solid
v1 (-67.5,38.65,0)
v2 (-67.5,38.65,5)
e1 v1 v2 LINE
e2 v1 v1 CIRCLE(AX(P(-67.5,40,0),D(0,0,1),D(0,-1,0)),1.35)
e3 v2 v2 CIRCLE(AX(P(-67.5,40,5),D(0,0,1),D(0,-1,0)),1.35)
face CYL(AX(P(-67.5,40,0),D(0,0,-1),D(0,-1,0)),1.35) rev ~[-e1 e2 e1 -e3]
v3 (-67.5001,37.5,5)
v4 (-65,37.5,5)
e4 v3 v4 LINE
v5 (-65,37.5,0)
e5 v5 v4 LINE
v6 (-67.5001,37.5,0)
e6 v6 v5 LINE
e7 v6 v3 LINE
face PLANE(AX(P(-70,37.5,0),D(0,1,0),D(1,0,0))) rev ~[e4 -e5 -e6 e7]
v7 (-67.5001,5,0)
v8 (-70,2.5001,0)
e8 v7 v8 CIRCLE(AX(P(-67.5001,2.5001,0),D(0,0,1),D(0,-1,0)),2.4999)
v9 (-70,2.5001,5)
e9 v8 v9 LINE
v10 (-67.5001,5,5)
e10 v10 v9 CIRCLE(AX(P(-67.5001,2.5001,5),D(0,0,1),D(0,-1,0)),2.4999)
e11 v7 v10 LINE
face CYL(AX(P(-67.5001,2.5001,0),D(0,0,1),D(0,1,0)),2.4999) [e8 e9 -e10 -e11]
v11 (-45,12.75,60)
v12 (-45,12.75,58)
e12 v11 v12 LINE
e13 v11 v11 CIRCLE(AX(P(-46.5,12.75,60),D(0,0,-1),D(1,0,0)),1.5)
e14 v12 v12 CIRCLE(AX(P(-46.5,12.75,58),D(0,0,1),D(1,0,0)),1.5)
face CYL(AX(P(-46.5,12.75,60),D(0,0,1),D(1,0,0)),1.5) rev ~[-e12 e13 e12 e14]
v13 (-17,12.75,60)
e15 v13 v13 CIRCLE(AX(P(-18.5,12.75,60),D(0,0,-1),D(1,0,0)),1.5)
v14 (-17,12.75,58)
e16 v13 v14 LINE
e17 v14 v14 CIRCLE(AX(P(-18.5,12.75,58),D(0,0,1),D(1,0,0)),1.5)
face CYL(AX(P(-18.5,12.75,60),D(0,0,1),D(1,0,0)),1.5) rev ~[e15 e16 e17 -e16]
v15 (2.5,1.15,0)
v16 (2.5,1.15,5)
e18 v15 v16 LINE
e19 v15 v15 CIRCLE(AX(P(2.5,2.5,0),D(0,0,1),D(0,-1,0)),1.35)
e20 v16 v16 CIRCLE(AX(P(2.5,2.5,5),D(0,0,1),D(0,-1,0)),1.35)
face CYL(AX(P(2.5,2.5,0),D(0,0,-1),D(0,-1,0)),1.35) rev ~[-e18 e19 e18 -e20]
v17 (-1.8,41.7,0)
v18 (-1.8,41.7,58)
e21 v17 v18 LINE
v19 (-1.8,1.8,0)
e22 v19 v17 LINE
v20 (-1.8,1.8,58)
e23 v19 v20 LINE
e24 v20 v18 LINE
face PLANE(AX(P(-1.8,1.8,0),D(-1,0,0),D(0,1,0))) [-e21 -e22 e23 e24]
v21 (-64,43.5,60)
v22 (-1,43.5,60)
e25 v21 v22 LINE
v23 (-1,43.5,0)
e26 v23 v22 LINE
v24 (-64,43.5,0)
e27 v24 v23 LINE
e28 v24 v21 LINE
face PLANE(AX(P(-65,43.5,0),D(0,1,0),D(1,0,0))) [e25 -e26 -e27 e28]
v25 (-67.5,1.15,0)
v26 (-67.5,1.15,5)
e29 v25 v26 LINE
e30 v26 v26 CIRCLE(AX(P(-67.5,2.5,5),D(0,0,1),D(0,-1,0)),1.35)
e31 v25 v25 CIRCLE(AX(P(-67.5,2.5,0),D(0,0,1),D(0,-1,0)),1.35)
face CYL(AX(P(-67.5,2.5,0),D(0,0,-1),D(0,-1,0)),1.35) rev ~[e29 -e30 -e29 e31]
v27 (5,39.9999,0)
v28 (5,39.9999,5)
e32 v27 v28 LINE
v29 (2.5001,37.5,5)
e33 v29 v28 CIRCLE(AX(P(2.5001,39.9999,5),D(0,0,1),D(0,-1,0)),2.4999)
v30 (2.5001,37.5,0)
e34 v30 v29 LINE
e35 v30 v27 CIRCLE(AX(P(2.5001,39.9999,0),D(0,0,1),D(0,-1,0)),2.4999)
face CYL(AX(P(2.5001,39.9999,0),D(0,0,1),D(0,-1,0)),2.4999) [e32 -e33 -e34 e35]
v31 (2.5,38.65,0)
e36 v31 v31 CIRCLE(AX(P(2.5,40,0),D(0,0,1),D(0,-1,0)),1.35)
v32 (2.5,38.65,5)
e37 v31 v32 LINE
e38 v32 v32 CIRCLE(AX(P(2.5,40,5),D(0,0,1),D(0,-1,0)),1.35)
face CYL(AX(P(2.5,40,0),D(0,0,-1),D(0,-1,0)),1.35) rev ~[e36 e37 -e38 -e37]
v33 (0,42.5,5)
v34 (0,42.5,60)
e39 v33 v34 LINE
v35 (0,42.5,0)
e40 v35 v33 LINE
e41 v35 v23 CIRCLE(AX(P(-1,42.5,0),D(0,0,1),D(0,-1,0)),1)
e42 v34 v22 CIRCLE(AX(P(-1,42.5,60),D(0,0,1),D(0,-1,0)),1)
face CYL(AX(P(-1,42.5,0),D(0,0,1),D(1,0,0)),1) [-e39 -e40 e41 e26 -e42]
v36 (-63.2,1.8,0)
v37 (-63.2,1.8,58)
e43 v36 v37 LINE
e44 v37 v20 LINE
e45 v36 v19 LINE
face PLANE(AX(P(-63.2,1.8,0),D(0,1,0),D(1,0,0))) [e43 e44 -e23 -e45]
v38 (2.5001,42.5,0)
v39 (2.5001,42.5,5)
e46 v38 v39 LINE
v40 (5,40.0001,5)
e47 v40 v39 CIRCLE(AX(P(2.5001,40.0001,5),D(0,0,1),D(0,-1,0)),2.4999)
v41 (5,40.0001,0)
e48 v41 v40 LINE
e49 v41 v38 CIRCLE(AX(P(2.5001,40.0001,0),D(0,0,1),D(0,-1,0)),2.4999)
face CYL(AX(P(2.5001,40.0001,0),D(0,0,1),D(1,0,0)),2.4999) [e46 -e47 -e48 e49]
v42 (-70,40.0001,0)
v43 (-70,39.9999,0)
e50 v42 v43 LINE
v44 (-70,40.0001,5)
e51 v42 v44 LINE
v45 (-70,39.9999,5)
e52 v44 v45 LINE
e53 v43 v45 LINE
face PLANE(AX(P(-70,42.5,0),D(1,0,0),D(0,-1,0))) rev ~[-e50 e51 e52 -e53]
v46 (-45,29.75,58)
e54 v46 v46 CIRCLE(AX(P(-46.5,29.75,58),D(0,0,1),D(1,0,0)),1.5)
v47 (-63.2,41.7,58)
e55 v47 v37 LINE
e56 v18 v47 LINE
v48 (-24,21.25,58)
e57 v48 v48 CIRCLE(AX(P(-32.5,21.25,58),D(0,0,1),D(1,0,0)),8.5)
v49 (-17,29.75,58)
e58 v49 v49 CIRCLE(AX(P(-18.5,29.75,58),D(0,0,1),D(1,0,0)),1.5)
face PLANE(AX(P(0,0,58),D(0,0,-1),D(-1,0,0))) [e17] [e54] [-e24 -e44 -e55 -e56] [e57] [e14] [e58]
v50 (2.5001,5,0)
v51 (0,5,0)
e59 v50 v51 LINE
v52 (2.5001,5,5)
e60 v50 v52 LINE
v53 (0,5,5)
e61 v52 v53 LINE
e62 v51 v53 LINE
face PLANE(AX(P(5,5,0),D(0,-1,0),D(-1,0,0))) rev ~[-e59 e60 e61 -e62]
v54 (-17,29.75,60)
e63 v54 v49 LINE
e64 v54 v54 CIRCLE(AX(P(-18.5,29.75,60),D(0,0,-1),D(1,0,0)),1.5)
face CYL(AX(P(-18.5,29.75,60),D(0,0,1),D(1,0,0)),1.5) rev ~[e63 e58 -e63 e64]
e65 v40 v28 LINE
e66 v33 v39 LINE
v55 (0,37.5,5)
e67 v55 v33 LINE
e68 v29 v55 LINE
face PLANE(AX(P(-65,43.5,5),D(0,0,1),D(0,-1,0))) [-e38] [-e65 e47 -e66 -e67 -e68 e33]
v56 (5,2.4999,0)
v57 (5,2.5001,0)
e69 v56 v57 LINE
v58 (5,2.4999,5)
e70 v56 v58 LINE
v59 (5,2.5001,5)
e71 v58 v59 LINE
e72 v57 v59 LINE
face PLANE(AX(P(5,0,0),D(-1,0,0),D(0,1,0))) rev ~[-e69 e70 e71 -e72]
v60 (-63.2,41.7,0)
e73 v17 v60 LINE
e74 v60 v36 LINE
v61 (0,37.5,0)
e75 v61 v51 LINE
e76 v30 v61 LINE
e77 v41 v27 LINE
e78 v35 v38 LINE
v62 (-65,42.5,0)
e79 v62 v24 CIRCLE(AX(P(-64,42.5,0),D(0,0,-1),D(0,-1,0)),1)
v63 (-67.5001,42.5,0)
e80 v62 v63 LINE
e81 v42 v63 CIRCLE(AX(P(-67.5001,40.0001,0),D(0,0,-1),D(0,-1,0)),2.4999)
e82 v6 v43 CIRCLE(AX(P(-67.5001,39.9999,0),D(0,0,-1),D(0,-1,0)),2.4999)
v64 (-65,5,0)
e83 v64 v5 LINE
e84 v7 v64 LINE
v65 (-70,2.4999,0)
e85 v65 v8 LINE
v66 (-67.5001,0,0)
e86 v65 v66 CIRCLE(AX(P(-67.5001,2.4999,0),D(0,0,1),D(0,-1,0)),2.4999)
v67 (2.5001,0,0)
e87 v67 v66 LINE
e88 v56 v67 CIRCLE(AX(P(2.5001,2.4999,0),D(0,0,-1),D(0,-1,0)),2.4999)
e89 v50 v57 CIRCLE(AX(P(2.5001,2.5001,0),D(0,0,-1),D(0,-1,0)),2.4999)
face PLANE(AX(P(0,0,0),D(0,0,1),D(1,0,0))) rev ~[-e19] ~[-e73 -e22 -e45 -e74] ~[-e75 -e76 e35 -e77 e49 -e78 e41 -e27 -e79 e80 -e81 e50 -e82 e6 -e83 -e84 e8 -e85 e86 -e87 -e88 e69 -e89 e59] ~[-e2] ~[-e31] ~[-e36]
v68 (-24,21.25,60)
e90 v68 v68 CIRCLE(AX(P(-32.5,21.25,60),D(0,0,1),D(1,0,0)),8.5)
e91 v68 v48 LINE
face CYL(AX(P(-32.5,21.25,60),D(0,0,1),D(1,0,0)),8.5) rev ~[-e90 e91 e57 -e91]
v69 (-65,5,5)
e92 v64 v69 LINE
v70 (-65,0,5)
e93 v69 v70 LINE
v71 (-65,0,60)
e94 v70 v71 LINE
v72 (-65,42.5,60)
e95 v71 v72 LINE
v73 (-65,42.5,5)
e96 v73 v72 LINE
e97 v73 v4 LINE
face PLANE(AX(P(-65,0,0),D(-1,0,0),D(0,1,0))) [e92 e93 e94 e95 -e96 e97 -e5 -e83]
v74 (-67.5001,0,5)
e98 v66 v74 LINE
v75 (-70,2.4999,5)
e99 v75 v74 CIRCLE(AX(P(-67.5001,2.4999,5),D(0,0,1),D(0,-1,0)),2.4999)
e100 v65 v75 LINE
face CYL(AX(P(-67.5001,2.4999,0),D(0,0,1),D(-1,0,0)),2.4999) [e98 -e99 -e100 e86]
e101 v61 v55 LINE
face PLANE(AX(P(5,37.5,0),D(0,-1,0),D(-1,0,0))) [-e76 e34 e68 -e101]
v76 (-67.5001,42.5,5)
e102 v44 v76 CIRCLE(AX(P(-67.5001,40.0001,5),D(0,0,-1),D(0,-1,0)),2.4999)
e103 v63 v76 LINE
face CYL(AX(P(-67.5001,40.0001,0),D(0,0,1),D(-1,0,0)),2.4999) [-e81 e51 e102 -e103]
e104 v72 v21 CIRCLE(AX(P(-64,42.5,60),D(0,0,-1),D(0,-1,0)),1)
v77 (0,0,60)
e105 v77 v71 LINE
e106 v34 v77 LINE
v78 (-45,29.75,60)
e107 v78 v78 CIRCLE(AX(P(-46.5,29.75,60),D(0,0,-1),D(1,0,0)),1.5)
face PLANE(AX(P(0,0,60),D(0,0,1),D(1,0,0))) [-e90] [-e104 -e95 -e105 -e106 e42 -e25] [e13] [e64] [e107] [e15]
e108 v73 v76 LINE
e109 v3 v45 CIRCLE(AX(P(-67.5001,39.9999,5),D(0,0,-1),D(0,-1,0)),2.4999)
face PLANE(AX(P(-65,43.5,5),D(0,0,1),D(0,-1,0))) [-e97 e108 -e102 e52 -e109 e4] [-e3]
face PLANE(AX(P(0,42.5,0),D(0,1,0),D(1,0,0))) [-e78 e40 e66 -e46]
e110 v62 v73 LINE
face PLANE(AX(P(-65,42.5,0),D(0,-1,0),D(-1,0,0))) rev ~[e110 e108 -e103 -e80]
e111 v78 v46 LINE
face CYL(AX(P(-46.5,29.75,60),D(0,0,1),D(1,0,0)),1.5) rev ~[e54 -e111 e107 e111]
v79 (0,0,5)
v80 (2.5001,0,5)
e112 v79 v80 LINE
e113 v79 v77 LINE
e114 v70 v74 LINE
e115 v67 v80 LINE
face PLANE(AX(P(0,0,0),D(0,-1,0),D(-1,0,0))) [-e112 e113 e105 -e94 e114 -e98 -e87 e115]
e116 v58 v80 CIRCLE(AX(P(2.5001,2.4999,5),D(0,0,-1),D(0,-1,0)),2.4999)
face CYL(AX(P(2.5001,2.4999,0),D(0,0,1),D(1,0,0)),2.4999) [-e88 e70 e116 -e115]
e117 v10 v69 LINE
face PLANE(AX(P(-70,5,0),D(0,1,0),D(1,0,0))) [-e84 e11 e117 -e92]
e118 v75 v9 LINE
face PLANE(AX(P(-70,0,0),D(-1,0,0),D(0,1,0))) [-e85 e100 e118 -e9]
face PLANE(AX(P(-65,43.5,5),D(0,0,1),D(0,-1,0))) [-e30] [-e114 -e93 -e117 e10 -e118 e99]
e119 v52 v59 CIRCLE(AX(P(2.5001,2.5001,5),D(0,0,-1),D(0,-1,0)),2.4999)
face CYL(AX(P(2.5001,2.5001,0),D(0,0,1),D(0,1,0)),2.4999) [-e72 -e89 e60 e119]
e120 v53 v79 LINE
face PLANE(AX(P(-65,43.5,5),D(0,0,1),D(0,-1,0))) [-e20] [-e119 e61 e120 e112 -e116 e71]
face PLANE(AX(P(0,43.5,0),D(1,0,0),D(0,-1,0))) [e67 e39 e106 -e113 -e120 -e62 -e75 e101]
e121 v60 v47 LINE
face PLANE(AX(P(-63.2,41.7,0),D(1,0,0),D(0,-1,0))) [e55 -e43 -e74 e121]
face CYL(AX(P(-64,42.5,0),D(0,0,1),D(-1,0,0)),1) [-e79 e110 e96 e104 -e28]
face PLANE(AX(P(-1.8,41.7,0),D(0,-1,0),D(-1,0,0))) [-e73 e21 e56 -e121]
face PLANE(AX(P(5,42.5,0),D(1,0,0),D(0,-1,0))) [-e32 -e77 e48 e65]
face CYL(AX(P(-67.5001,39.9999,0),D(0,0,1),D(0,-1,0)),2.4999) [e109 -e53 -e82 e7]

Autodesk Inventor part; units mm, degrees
ref_plane "YZ Plane" through (0, 0, 0) normal (1, 0, 0) x (0, 1, 0)
ref_plane "XZ Plane" through (0, 0, 0) normal (0, 1, 0) x (-1, 0, 0)
sketch "Sketch1" plane through (0, 0, 0) normal (0, 0, 1) x (1, 0, 0)
  line L0 (0, 0) -> (-65, 0)
  line L1 (-65, 0) -> (-65, 43.5)
  line L2 (-65, 43.5) -> (0, 43.5)
  line L3 (0, 43.5) -> (0, 0)
  dimension "d0" = 43.5
  dimension "d1" = 65
extrude "Extrusion1" add sketch "Sketch1" along normal blind 60
sketch "Sketch2" plane through (0, 0, 0) normal (0, 0, -1) x (-1, 0, 0)
  line L0 (1.8, 41.7) -> (63.2, 41.7)
  line L1 (63.2, 41.7) -> (63.2, 1.8)
  line L2 (63.2, 1.8) -> (1.8, 1.8)
  line L3 (1.8, 1.8) -> (1.8, 41.7)
  line L4 (65, 43.5) -> (65, 0) projected
  line L5 (0, 43.5) -> (65, 43.5) projected
  line L6 (0, 0) -> (0, 43.5) projected
  line L7 (65, 0) -> (0, 0) projected
  point P0 (65, 21.75)
  dimension "d4" = 1.8
  dimension "d5" = 1.8
  dimension "d6" = 1.8
  dimension "d7" = 1.8
extrude "Extrusion2" cut sketch "Sketch2" against normal blind 58 contours L0 L1 L2 L3
fillet "Fillet1" radius 1 2 edges at (-65, 43.5, 30) (0, 43.5, 30)
sketch "Sketch5" plane through (0, 0, 60) normal (0, 0, 1) x (1, 0, 0)
  circle A0 centre (-32.5, 21.25) radius 8.5
  line L0 (-1, 43.5) -> (-64, 43.5) projected
  line L1 (-65, 42.5) -> (-65, 0) projected
  point P0 (0, 0)
  point P1 (-32.5, 43.5)
  point P2 (-65, 21.25)
  dimension "d41" = 17
extrude "Extrusion5" cut sketch "Sketch5" against normal blind 10
sketch "Sketch6" plane through (0, 0, 60) normal (0, 0, 1) x (1, 0, 0)
  line L0 (-47.5, 33.25) -> (-17.5, 33.25)
  line L1 (-17.5, 33.25) -> (-17.5, 9.25)
  line L2 (-17.5, 9.25) -> (-47.5, 9.25)
  line L3 (-47.5, 9.25) -> (-47.5, 33.25)
  line L4 (-1, 43.5) -> (-64, 43.5) projected
  line L5 (0, 0) -> (0, 42.5) projected
  circle A0 centre (-44.5, 32.25) radius 1.5
  circle A1 centre (-46.5, 29.75) radius 1.5
  line L6 (-32.5, 33.25) -> (-32.5, 9.25) construction
  line L7 (-47.5, 21.25) -> (-17.5, 21.25) construction
  line L8 (-17.5, 33.25) -> (-47.5, 33.25)
  line L9 (-17.5, 9.25) -> (-17.5, 33.25)
  circle A2 centre (-20.5, 32.25) radius 1.5
  circle A3 centre (-18.5, 29.75) radius 1.5
  circle A4 centre (-44.5, 10.25) radius 1.5
  circle A5 centre (-46.5, 12.75) radius 1.5
  circle A6 centre (-18.5, 12.75) radius 1.5
  circle A7 centre (-20.5, 10.25) radius 1.5
  point P0 (-32.5, 43.5)
  point P1 (0, 21.25)
  point P2 (-47.5, 9.25)
  point P3 (-17.5, 9.25)
  point P4 (-17.5, 9.25)
  point P5 (-47.5, 9.25)
  dimension "d44" = 30
  dimension "d45" = 24
  dimension "d46" = 3
  dimension "d47" = 3
  dimension "d49" = 1
  dimension "d50" = 1
  dimension "d53" = 8.5
  dimension "d54" = 12
extrude "Extrusion6" cut sketch "Sketch6" against normal up to surface (2 mm away) contours A1 L3 | L3 A1 | A5 L3 | L3 A5 | A3 L1 | L1 A3 | A6 L1 | L1 A6
sketch "Sketch7" plane through (0, 0, 60) normal (0, 0, 1) x (1, 0, 0)
  line L0 (-65, 42.5) -> (-65, 0) projected
  line L1 (-65, 42.5) -> (-70, 42.5)
  line L2 (-70, 42.5) -> (-70, 37.5)
  line L3 (-70, 37.5) -> (-65, 37.5)
  line L4 (-65, 37.5) -> (-65, 42.5)
  line L5 (0, 0) -> (0, 42.5) projected
  line L6 (0, 42.5) -> (5, 42.5)
  line L7 (5, 42.5) -> (5, 37.5)
  line L8 (5, 37.5) -> (0, 37.5)
  line L9 (0, 37.5) -> (0, 42.5)
  line L10 (-65, 0) -> (0, 0) projected
  line L11 (0, 0) -> (5, 0)
  line L12 (5, 0) -> (5, 5)
  line L13 (5, 5) -> (0, 5)
  line L14 (0, 5) -> (0, 0)
  line L15 (-65, 0) -> (-70, 0)
  line L16 (-70, 0) -> (-70, 5)
  line L17 (-70, 5) -> (-65, 5)
  line L18 (-65, 5) -> (-65, 0)
  circle A0 centre (-67.5, 40) radius 1.35
  circle A1 centre (-67.5, 2.5) radius 1.35
  circle A2 centre (2.5, 2.5) radius 1.35
  circle A3 centre (2.5, 40) radius 1.35
  dimension "d57" = 5
  dimension "d58" = 5
  dimension "d59" = 5
  dimension "d60" = 5
  dimension "d61" = 5
  dimension "d62" = 5
  dimension "d63" = 5
  dimension "d64" = 5
  dimension "d65" = 2.7
  dimension "d66" = 2.7
  dimension "d67" = 2.7
  dimension "d68" = 2.7
  dimension "d69" = 2.5
  dimension "d70" = 2.5
  dimension "d71" = 2.5
  dimension "d72" = 2.5
  dimension "d73" = 2.5
  dimension "d74" = 2.5
  dimension "d75" = 2.5
  dimension "d76" = 2.5
ref_plane "Work Plane1" through (-65, 43.5, 0) normal (0, 0, 1) x (0, -1, 0)
sketch "Sketch8" plane through (-65, 43.5, 0) normal (0, 0, 1) x (0, -1, 0)
  line L0 (6, 70) -> (6, 65) projected
  circle A0 centre (3.5, 67.5) radius 1.35 projected
  line L1 (1, 70) -> (6, 70) projected
  line L2 (1, 65) -> (1, 70) projected
  line L3 (43.5, 65) -> (43.5, 70) projected
  circle A1 centre (41, 67.5) radius 1.35 projected
  line L4 (43.5, 70) -> (38.5, 70) projected
  line L5 (38.5, 70) -> (38.5, 65) projected
  line L6 (43.5, 0) -> (43.5, -5) projected
  circle A2 centre (41, -2.5) radius 1.35 projected
  line L7 (43.5, -5) -> (38.5, -5) projected
  line L8 (38.5, -5) -> (38.5, 0) projected
  line L9 (6, -5) -> (6, 0) projected
  circle A3 centre (3.5, -2.5) radius 1.35 projected
  line L10 (1, -5) -> (6, -5) projected
  line L11 (1, 0) -> (1, -5) projected
  circle A4 centre (3.5, 67.5) radius 1.35
  circle A5 centre (41, 67.5) radius 1.35
  circle A6 centre (41, -2.5) radius 1.35
  circle A7 centre (3.5, -2.5) radius 1.35
  line L12 (1, 0) -> (43.5, 0) projected
  line L13 (1, 0) -> (6, 0)
  line L14 (6, 0) -> (6, -5)
  line L15 (6, -5) -> (1, -5)
  line L16 (1, -5) -> (1, 0)
  line L17 (38.5, 0) -> (43.5, 0)
  line L18 (43.5, 0) -> (43.5, -5)
  line L19 (43.5, -5) -> (38.5, -5)
  line L20 (38.5, -5) -> (38.5, 0)
  line L21 (38.5, 65) -> (43.5, 65)
  line L22 (43.5, 65) -> (43.5, 70)
  line L23 (43.5, 70) -> (38.5, 70)
  line L24 (38.5, 70) -> (38.5, 65)
  line L25 (43.5, 65) -> (1, 65) projected
  line L26 (1, 65) -> (6, 65)
  line L27 (6, 65) -> (6, 70)
  line L28 (6, 70) -> (1, 70)
  line L29 (1, 70) -> (1, 65)
extrude "Extrusion7" add sketch "Sketch8" along normal blind 5
full round fillet "Full Round Fillet5" first side at (-66.6667, 42.5, 1.6667) centre faces at (-70, 40.8333, 1.6667) second side at (-68.3333, 37.5, 1.6667)
full round fillet "Full Round Fillet6" first side at (-43.3333, 0, 23.3333) centre faces at (-70, 3.3333, 1.6667) second side at (-66.6667, 5, 1.6667)
full round fillet "Full Round Fillet7" first side at (1.6667, 42.5, 3.3333) centre faces at (5, 39.1667, 1.6667) second side at (1.6667, 37.5, 1.6667)
full round fillet "Full Round Fillet8" first side at (-43.3333, 0, 23.3333) centre faces at (5, 1.6667, 1.6667) second side at (3.3333, 5, 1.6667)
properties part number "CAMCOVER"
